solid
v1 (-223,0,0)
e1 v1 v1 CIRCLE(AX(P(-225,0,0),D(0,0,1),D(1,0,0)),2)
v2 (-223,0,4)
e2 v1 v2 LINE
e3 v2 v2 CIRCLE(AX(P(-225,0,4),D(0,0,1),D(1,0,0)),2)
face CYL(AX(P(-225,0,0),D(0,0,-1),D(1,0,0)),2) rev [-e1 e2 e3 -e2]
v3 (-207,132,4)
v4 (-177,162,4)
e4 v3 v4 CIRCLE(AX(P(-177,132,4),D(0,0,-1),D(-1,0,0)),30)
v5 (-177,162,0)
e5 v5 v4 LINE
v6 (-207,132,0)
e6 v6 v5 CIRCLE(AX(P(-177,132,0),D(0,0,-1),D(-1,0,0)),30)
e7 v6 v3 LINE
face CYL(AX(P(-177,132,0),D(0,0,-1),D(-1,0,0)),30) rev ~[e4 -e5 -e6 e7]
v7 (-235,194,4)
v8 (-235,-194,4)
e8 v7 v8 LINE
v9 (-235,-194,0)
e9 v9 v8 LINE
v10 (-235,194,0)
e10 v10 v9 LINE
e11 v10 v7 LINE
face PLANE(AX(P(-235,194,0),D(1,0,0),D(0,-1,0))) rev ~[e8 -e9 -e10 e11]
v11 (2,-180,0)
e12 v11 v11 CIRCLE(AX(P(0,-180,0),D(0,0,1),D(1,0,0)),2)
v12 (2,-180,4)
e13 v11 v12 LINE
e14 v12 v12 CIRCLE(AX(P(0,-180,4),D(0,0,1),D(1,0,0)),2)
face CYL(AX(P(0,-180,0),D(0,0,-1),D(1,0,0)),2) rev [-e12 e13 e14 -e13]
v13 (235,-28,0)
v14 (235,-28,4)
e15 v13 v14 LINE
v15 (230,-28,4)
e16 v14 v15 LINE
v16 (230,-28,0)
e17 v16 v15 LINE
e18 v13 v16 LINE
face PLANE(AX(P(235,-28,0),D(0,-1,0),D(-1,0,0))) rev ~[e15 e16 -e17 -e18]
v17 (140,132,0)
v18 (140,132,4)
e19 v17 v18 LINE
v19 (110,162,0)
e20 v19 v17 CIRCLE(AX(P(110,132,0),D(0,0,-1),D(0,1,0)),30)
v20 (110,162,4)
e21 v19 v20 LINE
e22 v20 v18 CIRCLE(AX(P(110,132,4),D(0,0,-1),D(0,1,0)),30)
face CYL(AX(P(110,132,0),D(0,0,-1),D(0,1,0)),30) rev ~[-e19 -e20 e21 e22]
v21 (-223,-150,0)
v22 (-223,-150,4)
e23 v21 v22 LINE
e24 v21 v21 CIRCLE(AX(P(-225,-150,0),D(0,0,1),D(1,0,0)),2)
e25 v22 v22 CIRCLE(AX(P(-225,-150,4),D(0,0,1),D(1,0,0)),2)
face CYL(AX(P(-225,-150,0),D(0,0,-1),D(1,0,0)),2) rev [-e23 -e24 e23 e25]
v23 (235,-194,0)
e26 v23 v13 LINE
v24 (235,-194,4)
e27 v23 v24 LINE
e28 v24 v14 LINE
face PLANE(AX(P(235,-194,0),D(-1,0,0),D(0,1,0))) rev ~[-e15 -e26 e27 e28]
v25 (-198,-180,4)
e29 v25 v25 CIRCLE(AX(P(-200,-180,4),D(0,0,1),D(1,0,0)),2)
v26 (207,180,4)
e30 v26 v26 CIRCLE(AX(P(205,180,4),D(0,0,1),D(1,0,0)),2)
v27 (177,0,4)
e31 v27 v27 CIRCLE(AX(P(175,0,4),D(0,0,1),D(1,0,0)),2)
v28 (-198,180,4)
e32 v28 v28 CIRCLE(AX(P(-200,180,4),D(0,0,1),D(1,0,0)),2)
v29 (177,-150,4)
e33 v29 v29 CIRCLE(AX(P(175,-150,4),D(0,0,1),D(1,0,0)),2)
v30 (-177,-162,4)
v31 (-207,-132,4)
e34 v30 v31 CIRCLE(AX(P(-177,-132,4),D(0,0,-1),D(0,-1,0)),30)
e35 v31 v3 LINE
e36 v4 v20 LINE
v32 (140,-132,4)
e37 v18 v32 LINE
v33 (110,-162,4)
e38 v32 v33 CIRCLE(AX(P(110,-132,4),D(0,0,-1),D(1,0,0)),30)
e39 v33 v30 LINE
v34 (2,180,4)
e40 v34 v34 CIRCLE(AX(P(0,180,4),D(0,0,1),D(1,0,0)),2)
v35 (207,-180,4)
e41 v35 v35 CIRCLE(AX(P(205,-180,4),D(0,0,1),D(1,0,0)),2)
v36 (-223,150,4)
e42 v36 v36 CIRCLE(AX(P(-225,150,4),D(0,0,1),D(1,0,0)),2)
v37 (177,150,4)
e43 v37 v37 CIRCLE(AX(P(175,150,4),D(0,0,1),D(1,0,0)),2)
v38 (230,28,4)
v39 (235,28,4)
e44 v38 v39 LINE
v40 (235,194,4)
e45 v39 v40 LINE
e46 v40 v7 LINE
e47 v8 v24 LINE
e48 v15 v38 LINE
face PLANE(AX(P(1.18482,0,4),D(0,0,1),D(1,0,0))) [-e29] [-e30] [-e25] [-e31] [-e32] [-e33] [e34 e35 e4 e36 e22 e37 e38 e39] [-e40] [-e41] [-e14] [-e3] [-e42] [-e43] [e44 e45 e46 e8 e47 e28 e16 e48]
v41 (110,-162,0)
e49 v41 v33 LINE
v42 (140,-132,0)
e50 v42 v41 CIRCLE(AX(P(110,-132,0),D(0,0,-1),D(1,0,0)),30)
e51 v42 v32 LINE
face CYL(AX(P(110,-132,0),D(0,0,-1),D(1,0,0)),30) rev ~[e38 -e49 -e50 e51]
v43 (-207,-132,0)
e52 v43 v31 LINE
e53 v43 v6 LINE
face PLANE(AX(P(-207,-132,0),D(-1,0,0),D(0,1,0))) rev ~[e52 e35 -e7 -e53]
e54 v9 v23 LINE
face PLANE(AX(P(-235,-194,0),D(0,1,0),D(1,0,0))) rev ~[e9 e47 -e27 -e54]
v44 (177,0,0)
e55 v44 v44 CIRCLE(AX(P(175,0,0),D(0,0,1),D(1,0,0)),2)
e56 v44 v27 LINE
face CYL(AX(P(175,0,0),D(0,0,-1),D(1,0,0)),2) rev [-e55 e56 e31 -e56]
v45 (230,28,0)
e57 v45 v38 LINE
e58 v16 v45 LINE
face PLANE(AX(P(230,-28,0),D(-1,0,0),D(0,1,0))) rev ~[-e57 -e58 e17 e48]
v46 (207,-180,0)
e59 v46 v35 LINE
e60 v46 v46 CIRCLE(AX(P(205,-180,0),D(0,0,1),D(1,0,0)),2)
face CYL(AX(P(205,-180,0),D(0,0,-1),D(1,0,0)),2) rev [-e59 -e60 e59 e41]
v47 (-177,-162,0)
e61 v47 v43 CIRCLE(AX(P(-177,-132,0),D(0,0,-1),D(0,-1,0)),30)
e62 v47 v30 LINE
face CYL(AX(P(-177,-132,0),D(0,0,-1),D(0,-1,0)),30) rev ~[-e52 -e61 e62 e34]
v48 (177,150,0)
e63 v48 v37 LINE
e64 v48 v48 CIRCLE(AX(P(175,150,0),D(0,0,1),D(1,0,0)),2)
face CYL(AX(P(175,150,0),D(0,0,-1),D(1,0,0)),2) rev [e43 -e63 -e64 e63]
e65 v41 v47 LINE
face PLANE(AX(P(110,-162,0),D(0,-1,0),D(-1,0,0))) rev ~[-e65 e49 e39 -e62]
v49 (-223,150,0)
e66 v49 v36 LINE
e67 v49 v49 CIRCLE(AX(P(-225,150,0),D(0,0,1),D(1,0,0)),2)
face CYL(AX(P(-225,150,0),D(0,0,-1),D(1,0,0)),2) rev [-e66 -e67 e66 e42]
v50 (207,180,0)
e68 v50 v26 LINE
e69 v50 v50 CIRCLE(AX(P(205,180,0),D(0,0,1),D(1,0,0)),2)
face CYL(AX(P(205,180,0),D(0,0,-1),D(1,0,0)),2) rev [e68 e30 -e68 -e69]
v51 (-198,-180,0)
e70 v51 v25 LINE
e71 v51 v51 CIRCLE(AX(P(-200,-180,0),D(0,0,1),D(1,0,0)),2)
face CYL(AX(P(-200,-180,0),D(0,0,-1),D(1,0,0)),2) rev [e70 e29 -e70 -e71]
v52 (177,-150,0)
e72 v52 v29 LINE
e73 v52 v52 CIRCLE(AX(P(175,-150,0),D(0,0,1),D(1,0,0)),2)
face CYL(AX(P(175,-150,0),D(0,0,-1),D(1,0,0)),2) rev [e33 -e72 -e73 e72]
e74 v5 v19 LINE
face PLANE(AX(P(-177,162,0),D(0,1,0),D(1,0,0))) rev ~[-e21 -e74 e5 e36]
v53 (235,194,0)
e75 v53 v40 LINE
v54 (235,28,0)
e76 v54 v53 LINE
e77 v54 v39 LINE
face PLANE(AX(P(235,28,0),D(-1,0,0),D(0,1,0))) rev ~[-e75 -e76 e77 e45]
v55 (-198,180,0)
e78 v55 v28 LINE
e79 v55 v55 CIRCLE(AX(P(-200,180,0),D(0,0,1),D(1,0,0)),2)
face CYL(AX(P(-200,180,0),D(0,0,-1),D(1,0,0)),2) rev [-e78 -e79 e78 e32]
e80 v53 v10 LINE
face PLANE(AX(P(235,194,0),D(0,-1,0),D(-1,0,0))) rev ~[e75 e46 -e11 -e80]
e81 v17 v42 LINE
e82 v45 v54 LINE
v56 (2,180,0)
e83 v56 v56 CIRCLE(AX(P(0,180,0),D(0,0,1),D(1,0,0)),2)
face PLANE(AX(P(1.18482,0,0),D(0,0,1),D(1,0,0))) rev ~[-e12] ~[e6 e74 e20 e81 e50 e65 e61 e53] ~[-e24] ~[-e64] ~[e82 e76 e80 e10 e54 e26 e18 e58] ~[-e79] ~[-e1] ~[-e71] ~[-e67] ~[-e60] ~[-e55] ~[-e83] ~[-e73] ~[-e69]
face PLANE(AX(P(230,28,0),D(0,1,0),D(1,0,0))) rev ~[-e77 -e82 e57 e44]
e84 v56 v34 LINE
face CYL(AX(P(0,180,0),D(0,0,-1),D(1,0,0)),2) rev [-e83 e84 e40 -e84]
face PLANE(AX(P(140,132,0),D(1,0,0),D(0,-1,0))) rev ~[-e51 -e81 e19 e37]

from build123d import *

# Parameters (mm, degrees)
F0_R     = 2
F1_DEPTH = 4


# Not quite as in the source:
# - a feature names something its author has since deleted; it is built from what else it names


with BuildPart() as f1:
    # F0 (on Top) → F1 (new body)
    with BuildSketch(Plane.XY):
        Polygon((-235, 194), (-235, 190), (-235, -170), (-235, -190), (-235, -194), (235, -194), (235, -190), (235, -28), (230, -28), (230, 0), (230, 28), (235, 28), (235, 190), (235, 194), align=None)
        with Locations((-200, -180)):
            Circle(F0_R, mode=Mode.SUBTRACT)
        with Locations((-225, -150)):
            Circle(F0_R, mode=Mode.SUBTRACT)
        with Locations((-225, 0)):
            Circle(F0_R, mode=Mode.SUBTRACT)
        with BuildLine():
            Line((110, -161.9999999998), (-177, -162))
            ThreePointArc((-177, -162), (-198.2132034356, -153.2132034356), (-207, -132))
            Line((-207, -132), (-207, 0))
            Line((-207, 0), (-207, 132))
            ThreePointArc((-207, 132), (-198.2132034356, 153.2132034356), (-177, 162))
            Line((-177, 162), (110, 161.9999999998))
            ThreePointArc((110, 161.9999999998), (131.2132034356, 153.2132034354), (140, 131.9999999998))
            Line((140, 131.9999999998), (140, 0))
            Line((140, 0), (140, -131.9999999998))
            ThreePointArc((140, -131.9999999998), (131.2132034356, -153.2132034354), (110, -161.9999999998))
        make_face(mode=Mode.SUBTRACT)
        with Locations((0, -180)):
            Circle(F0_R, mode=Mode.SUBTRACT)
        with Locations((175, -150)):
            Circle(F0_R, mode=Mode.SUBTRACT)
        with Locations((205, -180)):
            Circle(F0_R, mode=Mode.SUBTRACT)
        with Locations((175, 0)):
            Circle(F0_R, mode=Mode.SUBTRACT)
        with Locations((-225, 150)):
            Circle(F0_R, mode=Mode.SUBTRACT)
        with Locations((-200, 180)):
            Circle(F0_R, mode=Mode.SUBTRACT)
        with Locations((0, 180)):
            Circle(F0_R, mode=Mode.SUBTRACT)
        with Locations((175, 150)):
            Circle(F0_R, mode=Mode.SUBTRACT)
        with Locations((205, 180)):
            Circle(F0_R, mode=Mode.SUBTRACT)
    extrude(amount=F1_DEPTH)


solid = f1.part
